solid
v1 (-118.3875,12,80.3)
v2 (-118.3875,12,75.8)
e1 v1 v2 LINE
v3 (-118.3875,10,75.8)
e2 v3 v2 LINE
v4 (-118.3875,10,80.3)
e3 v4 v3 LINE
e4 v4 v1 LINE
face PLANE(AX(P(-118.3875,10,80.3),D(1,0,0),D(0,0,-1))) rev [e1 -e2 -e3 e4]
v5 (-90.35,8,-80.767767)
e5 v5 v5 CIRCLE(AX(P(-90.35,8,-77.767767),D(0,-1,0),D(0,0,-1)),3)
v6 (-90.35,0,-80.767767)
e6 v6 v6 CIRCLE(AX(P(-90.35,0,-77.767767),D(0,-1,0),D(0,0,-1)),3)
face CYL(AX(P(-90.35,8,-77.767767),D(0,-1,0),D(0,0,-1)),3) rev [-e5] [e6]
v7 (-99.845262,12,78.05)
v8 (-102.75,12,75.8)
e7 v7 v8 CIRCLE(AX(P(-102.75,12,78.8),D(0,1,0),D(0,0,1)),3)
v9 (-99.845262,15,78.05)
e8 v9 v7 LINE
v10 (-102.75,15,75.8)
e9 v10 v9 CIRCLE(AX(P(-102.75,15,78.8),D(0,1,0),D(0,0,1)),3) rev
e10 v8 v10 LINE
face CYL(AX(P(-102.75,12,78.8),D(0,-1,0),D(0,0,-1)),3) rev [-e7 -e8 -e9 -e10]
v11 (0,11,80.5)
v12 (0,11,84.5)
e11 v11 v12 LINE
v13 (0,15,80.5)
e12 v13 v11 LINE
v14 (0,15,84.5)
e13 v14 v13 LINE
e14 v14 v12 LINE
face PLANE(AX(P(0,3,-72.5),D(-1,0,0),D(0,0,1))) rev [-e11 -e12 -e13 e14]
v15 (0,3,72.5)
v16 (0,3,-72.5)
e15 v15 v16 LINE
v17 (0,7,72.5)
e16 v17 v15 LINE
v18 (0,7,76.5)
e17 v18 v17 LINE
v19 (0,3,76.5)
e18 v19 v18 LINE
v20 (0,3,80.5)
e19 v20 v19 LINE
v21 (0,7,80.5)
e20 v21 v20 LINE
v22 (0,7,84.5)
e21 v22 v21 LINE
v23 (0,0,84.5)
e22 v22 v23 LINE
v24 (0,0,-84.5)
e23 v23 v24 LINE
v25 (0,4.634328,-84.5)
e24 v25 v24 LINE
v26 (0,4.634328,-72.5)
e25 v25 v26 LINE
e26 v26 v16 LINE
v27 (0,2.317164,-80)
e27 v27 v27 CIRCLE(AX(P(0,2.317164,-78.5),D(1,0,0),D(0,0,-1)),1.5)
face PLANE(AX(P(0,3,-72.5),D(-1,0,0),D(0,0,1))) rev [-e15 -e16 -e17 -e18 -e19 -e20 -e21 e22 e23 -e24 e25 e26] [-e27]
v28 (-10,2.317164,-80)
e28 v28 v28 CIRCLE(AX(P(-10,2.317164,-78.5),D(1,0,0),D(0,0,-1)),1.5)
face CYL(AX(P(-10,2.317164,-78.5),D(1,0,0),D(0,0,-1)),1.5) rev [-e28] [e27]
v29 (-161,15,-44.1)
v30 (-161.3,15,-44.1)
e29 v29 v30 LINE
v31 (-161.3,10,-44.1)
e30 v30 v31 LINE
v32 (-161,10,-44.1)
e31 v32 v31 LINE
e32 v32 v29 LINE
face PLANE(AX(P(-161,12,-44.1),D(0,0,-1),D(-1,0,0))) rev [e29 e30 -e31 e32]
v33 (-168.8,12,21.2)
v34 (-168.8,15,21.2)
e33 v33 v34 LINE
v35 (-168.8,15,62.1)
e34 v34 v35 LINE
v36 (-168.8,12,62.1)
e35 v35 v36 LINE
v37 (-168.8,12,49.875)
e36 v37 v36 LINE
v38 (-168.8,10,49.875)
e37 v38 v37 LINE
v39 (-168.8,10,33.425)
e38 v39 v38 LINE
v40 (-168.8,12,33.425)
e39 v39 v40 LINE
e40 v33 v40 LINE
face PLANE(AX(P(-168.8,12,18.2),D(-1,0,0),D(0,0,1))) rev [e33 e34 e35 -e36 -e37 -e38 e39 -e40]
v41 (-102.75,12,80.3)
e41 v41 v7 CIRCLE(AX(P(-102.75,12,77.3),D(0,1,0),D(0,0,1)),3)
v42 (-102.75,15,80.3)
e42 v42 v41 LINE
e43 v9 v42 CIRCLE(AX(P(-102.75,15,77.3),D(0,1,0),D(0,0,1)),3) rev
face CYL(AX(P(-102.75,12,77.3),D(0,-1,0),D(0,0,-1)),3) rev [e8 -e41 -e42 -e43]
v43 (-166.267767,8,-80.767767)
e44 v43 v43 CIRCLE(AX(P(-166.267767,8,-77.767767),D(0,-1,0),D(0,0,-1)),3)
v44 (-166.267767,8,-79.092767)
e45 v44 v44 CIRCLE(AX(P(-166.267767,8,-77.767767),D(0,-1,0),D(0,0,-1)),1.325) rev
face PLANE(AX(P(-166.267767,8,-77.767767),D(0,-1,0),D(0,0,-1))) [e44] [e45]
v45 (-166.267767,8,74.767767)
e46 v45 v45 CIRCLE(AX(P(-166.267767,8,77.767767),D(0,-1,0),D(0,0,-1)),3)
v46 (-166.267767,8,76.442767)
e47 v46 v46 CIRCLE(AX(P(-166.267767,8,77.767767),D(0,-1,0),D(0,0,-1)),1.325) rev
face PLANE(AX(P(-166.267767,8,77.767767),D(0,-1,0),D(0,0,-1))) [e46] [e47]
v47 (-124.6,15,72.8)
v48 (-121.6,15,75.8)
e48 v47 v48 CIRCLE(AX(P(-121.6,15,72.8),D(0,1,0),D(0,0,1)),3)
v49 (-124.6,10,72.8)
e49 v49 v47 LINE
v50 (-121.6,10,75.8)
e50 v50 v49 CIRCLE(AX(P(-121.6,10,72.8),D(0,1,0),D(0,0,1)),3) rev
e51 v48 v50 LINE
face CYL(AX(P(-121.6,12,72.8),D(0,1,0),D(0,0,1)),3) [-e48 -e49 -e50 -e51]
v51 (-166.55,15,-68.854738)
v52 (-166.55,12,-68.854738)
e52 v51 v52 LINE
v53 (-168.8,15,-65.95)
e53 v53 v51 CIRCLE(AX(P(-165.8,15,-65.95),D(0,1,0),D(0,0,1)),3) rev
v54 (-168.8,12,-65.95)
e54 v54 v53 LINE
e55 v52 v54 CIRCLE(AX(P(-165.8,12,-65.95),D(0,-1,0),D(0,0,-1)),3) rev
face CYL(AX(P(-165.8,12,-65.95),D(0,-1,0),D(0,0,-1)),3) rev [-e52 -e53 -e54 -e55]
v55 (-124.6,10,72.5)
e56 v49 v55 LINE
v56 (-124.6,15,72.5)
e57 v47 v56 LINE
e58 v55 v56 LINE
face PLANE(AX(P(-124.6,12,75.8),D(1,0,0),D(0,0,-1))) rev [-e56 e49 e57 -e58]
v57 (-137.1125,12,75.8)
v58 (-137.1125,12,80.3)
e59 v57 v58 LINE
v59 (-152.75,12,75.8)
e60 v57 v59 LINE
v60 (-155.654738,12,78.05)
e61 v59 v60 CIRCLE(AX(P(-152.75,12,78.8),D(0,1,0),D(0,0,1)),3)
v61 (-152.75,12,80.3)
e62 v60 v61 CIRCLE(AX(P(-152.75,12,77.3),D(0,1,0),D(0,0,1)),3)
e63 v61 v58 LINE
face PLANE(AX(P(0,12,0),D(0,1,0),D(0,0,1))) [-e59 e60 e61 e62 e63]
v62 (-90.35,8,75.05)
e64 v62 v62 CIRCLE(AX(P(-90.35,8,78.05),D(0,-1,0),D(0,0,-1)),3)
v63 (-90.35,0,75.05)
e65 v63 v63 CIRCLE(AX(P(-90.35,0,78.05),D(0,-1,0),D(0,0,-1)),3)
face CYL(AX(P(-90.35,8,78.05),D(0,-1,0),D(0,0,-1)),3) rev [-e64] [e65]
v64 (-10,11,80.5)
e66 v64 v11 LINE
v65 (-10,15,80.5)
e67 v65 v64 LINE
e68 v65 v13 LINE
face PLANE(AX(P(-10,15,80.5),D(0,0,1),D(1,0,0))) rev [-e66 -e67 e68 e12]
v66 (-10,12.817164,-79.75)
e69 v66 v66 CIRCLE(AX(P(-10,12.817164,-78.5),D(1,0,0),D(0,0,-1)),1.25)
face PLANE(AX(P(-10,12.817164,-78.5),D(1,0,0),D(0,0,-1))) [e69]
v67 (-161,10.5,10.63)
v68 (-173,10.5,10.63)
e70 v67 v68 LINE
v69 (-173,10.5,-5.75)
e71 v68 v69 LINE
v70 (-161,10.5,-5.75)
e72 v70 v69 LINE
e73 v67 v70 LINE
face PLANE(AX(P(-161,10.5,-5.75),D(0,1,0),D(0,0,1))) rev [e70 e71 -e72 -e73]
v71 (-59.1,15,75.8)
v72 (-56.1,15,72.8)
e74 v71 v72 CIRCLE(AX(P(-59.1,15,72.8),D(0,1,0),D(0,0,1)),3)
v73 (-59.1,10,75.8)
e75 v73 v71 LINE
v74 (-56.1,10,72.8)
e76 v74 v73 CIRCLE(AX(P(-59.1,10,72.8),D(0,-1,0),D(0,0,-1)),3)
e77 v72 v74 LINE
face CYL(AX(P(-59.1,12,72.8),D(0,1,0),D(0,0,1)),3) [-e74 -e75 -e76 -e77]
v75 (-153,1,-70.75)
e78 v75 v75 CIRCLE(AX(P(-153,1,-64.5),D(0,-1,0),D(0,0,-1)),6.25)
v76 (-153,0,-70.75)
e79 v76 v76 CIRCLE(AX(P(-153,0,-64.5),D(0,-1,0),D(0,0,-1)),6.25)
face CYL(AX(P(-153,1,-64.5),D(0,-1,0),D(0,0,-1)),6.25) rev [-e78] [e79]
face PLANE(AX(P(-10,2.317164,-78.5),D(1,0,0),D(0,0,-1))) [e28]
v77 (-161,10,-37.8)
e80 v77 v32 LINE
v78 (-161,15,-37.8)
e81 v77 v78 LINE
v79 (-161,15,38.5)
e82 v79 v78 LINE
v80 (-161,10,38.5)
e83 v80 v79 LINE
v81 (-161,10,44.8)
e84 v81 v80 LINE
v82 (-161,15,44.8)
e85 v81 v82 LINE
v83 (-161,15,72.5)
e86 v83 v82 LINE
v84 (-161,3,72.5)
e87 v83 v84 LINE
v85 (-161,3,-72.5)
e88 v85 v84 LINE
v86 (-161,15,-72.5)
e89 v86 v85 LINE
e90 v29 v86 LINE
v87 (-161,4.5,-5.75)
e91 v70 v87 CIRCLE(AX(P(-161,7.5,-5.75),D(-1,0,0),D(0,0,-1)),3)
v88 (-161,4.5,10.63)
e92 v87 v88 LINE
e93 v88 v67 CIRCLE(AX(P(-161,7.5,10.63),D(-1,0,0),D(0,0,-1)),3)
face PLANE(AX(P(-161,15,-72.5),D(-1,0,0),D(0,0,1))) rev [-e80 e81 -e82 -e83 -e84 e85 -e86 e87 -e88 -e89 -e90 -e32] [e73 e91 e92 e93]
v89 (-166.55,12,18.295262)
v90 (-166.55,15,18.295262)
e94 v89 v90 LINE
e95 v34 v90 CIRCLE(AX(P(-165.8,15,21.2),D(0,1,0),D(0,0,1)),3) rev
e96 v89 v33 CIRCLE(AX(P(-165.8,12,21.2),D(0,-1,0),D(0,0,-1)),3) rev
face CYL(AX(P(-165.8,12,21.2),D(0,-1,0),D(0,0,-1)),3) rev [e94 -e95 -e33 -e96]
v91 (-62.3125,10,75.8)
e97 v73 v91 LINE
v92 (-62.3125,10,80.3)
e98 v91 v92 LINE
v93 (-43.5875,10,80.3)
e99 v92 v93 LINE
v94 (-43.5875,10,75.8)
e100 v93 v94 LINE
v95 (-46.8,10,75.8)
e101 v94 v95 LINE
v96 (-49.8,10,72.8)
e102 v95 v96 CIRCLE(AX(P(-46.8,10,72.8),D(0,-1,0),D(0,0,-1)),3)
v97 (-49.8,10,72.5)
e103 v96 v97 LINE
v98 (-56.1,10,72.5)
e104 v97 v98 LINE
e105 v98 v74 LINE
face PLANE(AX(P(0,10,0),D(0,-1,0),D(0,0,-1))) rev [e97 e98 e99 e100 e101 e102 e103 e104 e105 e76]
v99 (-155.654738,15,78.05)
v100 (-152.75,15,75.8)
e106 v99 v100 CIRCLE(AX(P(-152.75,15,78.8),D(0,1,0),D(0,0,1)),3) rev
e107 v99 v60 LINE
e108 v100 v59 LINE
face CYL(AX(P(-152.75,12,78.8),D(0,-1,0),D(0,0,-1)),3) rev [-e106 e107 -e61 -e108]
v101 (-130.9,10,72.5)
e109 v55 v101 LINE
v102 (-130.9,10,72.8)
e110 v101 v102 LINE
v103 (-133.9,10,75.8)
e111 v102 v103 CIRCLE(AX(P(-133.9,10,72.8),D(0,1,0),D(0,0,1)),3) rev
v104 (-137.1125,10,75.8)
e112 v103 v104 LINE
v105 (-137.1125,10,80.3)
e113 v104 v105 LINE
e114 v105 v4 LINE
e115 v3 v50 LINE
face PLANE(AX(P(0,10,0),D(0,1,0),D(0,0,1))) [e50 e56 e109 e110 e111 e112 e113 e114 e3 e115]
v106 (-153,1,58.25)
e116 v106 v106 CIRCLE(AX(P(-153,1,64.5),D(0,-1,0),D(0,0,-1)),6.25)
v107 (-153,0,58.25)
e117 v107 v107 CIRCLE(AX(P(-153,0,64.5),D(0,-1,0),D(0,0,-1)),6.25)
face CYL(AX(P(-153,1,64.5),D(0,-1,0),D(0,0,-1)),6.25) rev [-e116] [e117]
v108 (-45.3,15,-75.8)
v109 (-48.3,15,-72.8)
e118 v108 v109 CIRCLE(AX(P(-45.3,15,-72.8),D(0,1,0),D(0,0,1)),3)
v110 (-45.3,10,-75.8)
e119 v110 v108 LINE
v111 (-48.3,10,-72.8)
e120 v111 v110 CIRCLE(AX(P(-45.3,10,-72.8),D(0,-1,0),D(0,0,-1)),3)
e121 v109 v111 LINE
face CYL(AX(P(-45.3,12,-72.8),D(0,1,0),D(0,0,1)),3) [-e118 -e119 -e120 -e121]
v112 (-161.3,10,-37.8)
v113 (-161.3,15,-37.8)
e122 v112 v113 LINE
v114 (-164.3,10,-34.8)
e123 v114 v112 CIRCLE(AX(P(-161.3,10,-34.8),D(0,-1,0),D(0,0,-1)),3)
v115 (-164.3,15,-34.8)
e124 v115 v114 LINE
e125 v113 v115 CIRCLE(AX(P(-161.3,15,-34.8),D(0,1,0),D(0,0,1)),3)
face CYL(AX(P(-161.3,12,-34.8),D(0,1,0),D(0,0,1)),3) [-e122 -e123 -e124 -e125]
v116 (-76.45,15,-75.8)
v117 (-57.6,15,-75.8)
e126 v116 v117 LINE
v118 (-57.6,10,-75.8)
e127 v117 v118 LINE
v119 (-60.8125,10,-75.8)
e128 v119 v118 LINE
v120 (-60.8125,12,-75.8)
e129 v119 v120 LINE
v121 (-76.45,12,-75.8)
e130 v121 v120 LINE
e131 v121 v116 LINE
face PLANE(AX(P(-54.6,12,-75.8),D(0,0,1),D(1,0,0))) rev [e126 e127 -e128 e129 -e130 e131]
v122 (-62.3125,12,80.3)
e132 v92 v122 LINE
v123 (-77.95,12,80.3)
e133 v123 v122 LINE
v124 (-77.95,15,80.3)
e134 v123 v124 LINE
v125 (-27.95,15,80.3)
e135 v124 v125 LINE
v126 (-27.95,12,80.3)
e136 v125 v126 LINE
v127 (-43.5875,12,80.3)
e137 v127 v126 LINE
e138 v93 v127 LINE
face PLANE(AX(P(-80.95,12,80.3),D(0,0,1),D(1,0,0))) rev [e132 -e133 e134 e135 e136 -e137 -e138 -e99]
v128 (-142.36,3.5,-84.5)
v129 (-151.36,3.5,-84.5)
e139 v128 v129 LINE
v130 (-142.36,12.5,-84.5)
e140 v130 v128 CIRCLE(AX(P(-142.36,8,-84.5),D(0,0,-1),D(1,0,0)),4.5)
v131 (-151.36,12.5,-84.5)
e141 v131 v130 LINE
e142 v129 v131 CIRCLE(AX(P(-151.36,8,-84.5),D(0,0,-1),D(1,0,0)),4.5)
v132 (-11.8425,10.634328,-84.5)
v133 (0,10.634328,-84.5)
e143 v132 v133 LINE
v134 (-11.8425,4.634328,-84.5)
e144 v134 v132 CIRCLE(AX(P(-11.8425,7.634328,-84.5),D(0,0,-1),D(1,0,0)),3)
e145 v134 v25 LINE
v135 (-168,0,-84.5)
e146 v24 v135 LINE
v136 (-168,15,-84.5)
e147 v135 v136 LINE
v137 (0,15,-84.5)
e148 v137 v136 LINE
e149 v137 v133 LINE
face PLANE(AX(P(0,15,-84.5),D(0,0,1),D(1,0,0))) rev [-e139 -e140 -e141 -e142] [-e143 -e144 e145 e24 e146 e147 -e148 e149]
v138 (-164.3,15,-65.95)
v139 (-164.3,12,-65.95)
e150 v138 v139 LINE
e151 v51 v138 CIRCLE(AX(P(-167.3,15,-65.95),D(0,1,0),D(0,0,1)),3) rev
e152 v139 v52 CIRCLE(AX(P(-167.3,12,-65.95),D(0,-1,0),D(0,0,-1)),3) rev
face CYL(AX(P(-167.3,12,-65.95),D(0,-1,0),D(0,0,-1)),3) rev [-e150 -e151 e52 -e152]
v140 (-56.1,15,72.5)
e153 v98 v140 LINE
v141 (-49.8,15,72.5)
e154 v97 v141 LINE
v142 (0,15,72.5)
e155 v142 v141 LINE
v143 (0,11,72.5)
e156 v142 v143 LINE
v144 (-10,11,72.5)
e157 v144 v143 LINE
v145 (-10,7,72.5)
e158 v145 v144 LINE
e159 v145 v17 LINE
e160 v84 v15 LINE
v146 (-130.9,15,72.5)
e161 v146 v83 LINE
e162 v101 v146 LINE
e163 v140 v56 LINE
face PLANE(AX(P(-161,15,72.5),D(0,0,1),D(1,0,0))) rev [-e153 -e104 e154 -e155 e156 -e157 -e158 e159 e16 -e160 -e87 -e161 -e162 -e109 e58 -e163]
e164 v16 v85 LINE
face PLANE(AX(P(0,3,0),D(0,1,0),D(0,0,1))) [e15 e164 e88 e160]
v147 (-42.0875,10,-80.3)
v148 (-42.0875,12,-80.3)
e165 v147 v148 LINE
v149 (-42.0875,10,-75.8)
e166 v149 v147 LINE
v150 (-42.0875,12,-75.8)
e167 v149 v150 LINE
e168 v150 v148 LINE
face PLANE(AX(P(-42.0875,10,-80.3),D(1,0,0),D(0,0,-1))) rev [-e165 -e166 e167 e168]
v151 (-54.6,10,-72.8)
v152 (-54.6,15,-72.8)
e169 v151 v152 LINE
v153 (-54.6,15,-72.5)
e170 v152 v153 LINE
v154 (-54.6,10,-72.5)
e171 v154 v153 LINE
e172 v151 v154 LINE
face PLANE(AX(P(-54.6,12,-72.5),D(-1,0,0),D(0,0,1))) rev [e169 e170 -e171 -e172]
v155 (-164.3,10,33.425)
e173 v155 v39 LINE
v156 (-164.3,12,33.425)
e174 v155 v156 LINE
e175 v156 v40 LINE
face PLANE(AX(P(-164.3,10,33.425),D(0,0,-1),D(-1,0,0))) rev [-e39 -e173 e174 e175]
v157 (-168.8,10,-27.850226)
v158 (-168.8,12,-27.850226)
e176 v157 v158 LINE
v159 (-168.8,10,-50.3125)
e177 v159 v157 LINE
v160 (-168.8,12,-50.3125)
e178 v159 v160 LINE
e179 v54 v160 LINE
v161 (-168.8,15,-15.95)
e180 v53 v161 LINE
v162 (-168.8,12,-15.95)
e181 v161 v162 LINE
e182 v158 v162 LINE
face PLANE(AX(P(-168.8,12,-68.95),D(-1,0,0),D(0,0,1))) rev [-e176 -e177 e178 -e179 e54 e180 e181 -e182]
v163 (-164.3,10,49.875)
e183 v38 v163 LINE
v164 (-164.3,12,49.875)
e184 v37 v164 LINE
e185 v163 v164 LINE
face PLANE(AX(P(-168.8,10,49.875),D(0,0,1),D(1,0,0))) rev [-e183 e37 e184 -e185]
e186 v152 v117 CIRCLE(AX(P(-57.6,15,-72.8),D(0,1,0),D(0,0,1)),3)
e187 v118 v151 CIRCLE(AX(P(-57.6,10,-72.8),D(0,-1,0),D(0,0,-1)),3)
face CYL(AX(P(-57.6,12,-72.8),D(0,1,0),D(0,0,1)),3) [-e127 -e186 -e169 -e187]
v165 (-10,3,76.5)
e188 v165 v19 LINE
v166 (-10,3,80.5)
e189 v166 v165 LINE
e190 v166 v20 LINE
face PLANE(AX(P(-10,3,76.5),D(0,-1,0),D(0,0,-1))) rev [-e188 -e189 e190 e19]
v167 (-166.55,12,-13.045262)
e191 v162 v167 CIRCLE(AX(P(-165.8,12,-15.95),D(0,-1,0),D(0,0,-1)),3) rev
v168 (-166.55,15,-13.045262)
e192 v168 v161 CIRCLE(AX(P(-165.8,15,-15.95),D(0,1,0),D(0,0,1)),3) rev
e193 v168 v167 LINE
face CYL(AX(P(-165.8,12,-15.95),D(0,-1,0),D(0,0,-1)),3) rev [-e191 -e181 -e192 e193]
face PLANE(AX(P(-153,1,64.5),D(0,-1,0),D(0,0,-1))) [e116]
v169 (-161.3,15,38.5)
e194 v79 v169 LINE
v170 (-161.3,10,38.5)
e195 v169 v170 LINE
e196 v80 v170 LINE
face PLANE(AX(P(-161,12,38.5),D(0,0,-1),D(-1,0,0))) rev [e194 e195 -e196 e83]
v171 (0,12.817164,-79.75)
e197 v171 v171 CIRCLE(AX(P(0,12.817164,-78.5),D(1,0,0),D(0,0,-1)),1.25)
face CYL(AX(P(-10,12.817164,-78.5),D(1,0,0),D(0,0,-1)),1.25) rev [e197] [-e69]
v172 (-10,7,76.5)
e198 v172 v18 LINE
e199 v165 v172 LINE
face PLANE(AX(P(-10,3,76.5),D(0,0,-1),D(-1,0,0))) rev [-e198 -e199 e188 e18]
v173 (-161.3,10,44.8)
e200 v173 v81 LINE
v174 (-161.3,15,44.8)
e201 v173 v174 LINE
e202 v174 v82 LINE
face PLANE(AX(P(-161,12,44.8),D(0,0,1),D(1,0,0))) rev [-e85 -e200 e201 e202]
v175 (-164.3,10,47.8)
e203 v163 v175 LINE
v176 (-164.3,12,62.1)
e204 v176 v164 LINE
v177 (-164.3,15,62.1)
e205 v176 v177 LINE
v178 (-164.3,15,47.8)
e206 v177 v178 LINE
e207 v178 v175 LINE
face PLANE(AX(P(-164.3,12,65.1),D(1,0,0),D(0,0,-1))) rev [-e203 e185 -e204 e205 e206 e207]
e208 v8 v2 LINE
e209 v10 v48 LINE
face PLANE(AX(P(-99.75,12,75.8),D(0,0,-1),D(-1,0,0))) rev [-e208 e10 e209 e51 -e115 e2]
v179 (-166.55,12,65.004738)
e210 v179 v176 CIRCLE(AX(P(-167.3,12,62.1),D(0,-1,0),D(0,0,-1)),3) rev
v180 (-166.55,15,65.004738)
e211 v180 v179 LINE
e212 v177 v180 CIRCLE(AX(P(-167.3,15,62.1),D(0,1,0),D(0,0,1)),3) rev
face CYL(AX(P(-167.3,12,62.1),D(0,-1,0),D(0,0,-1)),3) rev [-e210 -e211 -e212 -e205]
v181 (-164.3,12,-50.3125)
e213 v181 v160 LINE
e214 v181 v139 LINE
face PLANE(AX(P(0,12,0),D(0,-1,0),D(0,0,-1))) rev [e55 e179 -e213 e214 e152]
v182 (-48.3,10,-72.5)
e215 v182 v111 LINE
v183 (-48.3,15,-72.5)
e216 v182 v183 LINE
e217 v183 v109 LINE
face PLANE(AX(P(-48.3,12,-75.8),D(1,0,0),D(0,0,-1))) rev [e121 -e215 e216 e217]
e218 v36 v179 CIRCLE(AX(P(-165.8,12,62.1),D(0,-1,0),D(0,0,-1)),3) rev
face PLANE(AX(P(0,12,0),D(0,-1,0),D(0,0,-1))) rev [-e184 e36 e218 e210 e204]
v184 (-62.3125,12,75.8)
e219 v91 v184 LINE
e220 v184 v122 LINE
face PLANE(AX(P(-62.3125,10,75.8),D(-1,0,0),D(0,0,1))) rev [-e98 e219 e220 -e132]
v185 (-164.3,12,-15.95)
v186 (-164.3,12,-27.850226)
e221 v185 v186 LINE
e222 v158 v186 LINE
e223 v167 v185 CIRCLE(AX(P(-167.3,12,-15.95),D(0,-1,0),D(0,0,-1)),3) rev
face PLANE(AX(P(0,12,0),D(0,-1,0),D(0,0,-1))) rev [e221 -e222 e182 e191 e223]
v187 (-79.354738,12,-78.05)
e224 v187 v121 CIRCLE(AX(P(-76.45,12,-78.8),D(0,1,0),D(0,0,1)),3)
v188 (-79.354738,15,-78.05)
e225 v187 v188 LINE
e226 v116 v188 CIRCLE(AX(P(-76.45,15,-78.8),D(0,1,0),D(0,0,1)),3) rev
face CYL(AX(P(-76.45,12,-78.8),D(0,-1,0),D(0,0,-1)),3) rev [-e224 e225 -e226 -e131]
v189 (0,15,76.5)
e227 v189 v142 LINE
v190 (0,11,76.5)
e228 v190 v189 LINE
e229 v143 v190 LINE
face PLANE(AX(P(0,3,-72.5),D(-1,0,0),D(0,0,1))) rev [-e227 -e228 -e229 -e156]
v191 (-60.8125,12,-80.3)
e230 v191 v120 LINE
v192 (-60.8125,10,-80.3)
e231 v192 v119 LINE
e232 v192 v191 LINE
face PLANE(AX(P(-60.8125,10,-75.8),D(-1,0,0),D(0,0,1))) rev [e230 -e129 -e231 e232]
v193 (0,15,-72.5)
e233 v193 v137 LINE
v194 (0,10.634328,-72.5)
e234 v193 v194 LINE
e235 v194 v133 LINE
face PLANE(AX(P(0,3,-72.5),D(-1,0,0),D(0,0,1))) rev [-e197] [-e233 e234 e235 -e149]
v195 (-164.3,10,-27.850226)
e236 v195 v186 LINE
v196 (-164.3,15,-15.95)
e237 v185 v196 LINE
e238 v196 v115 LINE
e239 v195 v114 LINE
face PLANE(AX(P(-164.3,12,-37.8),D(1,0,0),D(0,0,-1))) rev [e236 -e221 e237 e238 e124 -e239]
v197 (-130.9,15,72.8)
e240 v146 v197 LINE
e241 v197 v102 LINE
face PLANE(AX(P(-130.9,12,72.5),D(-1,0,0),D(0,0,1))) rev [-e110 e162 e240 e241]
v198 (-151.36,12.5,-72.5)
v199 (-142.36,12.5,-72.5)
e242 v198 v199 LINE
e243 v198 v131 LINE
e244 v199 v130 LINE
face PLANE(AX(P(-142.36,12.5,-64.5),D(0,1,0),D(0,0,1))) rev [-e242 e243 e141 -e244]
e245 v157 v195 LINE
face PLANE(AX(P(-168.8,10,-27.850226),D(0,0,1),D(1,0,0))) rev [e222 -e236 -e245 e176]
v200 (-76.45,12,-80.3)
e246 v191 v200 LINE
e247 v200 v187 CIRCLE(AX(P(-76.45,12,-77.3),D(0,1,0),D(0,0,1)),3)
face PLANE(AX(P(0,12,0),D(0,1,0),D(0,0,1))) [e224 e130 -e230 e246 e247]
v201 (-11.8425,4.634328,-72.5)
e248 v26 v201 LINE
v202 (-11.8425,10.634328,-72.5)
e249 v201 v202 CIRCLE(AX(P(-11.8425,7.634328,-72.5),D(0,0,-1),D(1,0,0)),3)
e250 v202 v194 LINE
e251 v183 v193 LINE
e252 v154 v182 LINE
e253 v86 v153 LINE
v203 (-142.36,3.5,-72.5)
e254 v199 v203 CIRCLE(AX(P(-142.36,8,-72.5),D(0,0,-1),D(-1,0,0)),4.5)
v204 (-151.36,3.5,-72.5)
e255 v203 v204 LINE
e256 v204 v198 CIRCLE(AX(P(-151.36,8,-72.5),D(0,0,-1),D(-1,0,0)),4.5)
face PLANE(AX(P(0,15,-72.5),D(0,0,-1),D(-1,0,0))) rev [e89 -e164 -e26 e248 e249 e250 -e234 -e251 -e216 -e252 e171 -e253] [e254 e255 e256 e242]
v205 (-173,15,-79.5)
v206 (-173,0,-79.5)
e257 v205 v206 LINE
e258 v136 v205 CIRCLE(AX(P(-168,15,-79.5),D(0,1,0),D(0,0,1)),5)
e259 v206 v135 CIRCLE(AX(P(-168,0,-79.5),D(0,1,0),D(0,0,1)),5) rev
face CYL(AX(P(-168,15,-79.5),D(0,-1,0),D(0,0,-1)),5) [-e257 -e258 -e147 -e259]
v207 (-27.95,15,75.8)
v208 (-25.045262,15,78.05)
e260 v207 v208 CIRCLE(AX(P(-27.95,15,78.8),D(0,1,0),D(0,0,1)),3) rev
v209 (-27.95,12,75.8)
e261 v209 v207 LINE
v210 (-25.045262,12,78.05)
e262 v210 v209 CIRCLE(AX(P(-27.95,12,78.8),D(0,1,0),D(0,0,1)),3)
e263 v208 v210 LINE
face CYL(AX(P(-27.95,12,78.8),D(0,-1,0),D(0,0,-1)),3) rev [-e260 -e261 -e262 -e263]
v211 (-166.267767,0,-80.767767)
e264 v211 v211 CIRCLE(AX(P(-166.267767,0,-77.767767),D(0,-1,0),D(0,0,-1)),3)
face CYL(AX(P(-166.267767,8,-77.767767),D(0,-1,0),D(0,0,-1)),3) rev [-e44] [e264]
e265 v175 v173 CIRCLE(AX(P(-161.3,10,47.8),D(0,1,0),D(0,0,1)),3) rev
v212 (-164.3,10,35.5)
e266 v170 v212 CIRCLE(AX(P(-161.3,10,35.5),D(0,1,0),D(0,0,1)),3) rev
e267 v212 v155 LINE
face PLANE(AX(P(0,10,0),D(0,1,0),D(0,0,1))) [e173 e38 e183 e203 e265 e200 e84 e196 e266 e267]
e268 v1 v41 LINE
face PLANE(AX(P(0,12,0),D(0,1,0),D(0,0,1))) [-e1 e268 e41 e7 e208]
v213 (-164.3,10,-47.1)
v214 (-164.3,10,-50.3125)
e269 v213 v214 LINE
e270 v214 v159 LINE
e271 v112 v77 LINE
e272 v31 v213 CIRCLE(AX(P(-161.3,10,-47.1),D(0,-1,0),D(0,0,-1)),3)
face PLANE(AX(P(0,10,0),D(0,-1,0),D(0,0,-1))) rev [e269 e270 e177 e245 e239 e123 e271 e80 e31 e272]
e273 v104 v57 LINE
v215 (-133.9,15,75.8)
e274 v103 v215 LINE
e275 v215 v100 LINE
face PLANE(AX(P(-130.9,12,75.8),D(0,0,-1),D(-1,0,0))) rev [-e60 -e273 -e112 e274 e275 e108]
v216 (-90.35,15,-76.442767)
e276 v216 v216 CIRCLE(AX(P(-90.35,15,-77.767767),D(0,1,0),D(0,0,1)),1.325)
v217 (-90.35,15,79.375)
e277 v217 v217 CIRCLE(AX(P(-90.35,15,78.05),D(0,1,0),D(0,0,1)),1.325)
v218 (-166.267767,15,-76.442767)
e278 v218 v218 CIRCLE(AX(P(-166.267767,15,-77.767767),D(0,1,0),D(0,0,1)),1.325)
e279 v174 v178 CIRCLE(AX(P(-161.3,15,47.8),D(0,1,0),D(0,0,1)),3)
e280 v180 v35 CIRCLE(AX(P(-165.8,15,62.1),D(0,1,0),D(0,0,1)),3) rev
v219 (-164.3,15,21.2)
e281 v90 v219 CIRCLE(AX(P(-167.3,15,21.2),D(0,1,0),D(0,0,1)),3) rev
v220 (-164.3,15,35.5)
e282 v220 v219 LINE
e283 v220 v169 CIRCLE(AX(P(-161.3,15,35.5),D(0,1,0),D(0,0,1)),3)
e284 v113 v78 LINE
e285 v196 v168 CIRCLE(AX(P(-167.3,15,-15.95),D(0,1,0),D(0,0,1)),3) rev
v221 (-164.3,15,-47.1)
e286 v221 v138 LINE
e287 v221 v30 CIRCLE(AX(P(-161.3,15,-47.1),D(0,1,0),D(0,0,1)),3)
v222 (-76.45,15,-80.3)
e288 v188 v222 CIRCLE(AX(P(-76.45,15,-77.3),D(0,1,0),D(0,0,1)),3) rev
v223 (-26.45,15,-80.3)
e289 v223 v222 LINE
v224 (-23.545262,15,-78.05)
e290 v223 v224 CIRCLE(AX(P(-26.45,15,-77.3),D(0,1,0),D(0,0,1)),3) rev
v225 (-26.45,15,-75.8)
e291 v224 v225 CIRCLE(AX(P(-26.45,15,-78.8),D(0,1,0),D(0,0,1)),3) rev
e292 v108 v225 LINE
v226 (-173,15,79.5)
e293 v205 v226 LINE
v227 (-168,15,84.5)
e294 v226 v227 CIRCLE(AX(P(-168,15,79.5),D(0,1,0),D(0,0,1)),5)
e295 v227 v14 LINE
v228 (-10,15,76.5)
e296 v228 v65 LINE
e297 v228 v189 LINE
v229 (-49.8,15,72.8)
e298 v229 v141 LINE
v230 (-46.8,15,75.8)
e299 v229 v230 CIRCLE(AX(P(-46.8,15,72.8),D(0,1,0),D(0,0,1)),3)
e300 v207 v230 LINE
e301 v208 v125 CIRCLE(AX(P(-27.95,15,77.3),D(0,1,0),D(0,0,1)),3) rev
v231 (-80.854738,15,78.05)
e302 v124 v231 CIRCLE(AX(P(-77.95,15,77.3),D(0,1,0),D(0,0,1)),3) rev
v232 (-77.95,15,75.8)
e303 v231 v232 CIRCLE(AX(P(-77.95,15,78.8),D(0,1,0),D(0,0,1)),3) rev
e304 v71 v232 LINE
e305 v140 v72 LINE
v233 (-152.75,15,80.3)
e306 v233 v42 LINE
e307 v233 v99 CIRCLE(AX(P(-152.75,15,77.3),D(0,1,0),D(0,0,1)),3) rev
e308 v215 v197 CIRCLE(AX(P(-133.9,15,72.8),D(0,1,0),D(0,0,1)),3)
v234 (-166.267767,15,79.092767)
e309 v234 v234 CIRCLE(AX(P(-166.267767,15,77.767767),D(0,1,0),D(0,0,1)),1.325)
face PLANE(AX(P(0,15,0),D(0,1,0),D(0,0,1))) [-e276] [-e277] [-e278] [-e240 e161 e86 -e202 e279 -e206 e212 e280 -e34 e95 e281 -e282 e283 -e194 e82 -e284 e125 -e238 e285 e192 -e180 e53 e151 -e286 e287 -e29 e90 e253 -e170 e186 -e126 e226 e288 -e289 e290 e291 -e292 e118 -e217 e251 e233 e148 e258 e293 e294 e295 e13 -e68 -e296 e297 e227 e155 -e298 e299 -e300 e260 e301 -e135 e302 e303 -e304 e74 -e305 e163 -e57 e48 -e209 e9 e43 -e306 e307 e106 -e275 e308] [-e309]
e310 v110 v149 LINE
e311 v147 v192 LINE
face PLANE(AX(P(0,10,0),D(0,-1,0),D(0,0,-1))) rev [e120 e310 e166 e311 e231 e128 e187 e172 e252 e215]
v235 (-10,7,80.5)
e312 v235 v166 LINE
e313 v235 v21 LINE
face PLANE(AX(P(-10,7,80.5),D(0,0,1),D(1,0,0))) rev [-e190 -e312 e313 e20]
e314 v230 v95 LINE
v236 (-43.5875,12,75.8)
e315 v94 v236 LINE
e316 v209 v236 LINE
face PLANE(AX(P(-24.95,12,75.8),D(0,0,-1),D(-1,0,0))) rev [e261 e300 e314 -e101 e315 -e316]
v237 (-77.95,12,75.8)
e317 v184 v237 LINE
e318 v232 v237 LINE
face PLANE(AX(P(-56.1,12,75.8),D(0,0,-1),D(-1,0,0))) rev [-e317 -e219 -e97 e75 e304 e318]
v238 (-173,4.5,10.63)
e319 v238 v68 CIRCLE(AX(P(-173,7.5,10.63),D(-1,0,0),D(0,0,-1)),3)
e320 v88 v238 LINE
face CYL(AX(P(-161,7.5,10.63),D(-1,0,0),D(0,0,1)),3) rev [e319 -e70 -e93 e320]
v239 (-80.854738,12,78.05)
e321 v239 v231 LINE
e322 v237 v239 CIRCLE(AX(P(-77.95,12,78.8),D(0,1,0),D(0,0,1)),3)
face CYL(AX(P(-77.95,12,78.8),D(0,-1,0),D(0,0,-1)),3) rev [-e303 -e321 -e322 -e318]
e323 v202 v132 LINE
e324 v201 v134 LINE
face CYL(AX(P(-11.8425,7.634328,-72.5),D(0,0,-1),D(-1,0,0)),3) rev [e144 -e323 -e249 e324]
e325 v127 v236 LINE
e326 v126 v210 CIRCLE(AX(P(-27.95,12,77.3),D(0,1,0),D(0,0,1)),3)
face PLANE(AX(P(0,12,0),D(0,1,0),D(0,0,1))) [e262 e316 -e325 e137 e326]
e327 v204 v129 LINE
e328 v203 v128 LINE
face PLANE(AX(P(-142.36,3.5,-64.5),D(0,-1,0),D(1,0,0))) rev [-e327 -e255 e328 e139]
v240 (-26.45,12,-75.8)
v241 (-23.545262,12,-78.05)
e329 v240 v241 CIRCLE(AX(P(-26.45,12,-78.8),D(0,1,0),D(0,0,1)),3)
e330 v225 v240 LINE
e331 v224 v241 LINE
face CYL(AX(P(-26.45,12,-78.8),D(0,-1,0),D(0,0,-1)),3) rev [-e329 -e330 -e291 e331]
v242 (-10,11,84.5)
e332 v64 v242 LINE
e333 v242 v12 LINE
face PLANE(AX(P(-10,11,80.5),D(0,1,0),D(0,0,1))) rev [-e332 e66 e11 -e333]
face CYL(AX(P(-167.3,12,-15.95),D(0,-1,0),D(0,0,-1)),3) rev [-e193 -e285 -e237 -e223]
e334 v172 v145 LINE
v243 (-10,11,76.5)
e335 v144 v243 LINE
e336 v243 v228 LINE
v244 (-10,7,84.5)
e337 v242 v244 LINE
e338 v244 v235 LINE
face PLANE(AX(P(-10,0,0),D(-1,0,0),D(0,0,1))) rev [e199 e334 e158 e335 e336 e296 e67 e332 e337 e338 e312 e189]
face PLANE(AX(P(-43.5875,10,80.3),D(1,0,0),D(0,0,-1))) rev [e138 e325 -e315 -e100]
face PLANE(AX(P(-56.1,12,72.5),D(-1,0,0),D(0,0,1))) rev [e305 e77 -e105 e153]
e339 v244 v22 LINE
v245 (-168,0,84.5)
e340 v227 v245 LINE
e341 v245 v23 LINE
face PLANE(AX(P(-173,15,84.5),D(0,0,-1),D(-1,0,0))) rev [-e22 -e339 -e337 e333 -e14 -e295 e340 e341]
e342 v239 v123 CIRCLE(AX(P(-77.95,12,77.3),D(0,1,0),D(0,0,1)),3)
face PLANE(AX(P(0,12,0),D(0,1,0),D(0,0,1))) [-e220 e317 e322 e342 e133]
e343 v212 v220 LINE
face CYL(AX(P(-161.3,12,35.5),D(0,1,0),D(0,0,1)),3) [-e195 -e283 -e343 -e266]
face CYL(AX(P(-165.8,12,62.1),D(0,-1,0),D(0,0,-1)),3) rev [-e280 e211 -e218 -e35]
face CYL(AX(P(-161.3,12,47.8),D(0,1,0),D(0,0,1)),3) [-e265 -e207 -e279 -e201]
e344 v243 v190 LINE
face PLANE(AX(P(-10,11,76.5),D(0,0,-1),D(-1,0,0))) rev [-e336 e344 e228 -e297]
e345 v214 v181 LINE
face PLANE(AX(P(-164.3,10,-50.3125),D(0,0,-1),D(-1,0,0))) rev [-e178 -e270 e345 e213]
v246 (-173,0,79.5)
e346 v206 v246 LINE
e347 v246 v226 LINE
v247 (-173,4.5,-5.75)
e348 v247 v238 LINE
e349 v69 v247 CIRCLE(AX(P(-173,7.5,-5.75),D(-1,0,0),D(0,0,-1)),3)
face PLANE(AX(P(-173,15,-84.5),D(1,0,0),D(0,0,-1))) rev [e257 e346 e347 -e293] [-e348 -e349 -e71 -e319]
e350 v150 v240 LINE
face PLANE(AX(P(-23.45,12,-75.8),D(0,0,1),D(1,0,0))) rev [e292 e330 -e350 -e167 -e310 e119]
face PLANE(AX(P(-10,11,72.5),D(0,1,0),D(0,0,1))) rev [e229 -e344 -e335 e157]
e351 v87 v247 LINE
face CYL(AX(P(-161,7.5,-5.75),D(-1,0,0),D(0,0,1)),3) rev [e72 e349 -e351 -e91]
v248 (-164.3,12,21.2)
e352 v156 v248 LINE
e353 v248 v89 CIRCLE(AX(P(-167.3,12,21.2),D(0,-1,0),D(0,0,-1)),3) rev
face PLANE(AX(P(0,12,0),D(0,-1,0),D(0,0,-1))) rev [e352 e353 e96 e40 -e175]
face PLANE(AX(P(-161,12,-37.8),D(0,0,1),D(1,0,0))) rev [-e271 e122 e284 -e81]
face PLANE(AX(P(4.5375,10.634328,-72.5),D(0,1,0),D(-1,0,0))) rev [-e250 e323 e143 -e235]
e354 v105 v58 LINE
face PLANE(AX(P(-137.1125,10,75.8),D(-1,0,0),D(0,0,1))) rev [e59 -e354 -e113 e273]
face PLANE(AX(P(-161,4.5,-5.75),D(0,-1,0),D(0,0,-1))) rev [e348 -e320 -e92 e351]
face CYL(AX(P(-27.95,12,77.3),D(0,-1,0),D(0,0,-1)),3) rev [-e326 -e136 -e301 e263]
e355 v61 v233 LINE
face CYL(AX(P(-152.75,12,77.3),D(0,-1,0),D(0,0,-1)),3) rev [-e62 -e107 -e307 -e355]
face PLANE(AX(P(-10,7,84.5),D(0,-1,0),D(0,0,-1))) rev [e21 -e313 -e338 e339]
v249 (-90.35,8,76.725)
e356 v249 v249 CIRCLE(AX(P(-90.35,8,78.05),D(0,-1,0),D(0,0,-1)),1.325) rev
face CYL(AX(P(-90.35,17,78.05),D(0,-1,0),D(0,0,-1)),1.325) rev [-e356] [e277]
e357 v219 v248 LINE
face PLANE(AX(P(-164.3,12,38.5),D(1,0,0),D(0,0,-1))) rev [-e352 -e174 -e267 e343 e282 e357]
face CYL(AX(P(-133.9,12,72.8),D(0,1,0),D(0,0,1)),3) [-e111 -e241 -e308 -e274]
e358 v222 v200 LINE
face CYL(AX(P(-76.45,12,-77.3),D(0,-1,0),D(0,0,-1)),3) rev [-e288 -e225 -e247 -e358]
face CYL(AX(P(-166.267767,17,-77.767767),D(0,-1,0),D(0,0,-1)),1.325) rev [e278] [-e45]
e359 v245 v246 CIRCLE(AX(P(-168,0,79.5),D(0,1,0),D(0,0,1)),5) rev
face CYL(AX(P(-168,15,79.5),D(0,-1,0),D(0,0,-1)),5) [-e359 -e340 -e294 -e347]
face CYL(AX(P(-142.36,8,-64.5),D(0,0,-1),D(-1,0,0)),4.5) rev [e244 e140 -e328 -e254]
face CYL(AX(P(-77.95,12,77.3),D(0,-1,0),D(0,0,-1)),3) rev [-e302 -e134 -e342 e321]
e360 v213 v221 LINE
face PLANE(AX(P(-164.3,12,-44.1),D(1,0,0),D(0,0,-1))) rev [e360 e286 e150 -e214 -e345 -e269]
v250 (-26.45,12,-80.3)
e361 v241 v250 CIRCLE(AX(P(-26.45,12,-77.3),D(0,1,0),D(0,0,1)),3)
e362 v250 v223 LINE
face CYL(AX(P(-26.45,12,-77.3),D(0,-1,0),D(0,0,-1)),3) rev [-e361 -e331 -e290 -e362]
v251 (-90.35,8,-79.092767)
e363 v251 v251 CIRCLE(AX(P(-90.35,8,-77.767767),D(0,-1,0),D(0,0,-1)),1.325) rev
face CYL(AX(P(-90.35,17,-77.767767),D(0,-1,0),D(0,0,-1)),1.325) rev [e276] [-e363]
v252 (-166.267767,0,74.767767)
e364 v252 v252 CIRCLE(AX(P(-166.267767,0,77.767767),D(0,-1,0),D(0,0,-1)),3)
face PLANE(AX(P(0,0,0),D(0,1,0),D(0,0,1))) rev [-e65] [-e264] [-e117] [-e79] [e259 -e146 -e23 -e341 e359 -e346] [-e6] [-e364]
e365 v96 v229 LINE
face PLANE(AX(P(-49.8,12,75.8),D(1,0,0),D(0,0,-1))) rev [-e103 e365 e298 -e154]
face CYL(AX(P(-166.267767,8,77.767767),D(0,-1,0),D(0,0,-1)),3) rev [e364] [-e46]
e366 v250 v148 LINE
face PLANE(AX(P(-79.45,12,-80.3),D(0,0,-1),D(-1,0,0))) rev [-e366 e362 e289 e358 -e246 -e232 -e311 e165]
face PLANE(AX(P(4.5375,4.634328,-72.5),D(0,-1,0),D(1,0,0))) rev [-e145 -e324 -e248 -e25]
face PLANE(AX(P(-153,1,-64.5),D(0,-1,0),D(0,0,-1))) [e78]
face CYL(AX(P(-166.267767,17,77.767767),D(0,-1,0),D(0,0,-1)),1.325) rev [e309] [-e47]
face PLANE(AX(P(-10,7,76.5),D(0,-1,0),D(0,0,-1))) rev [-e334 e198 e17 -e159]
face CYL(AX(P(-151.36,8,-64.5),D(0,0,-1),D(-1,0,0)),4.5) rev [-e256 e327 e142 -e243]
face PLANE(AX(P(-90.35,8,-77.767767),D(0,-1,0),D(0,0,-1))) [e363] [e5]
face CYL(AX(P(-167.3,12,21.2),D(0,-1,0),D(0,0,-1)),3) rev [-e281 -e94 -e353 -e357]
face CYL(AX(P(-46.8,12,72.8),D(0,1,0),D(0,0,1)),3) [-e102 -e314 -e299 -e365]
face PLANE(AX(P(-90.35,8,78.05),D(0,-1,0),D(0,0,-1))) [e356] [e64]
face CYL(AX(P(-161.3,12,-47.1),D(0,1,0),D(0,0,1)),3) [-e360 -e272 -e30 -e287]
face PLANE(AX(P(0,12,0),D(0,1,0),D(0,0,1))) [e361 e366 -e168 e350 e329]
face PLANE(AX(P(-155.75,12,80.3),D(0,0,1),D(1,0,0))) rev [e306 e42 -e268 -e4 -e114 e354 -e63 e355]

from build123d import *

# Parameters (mm, degrees)
SKETCH1_W           = 161
SKETCH1_H           = 145
BOSS_EXTRUDE1_DEPTH = 3
BOSS_EXTRUDE2_DEPTH = 15
CUT_EXTRUDE1_DEPTH  = 3
CUT_EXTRUDE2_DEPTH  = 2
CUT_EXTRUDE3_DEPTH  = 12
CUT_EXTRUDE5_DEPTH  = 12
CUT_EXTRUDE6_DEPTH  = 20
CUT_EXTRUDE8_DEPTH  = 10
FILLET2_R           = 5
FILLET3_R           = 5
SKETCH11_R          = 1.5
SKETCH11_R_2        = 1.25
CUT_EXTRUDE9_DEPTH  = 10
SKETCH12_R          = 1.325
CUT_EXTRUDE10_DEPTH = 17
SKETCH13_R          = 3
CUT_EXTRUDE11_DEPTH = 8
SKETCH14_R          = 6.25
CUT_EXTRUDE12_DEPTH = 1
FILLET5_R           = 3
FILLET6_R           = 3


with BuildPart() as part:
    # Sketch1 → Boss-Extrude1 (new body)
    with BuildSketch(Plane(origin=(0, 0, 0), x_dir=(1, 0, 0), z_dir=(0, 1, 0))):
        with Locations((-80.5, 0)):
            Rectangle(SKETCH1_W, SKETCH1_H)
    extrude(amount=BOSS_EXTRUDE1_DEPTH)

    # Sketch2 → Boss-Extrude2 (add)
    with BuildSketch(Plane(origin=(0, 0, 0), x_dir=(1, 0, 0), z_dir=(0, 1, 0))):
        Polygon((0, 72.5), (0, 84.5), (-173, 84.5), (-173, -84.5), (0, -84.5), (0, -72.5), (-161, -72.5), (-161, 72.5), align=None)
    extrude(amount=BOSS_EXTRUDE2_DEPTH)

    # Sketch3 → Cut-Extrude1 (cut)
    with BuildSketch(Plane(origin=(0, 15, 0), x_dir=(1, 0, 0), z_dir=(0, 1, 0))):
        Polygon((-161, 44.1), (-161, 37.8), (-164.3, 37.8), (-164.3, 12.95), (-168.8, 12.95), (-168.8, 68.95), (-164.3, 68.95), (-164.3, 44.1), align=None)
        Polygon((-24.95, -75.8), (-49.8, -75.8), (-49.8, -72.5), (-56.1, -72.5), (-56.1, -75.8), (-80.95, -75.8), (-80.95, -80.3), (-24.95, -80.3), align=None)
        Polygon((-161, -38.5), (-161, -44.8), (-164.3, -44.8), (-164.3, -65.1), (-168.8, -65.1), (-168.8, -18.2), (-164.3, -18.2), (-164.3, -38.5), align=None)
        Polygon((-99.75, -80.3), (-99.75, -75.8), (-124.6, -75.8), (-124.6, -72.5), (-130.9, -72.5), (-130.9, -75.8), (-155.75, -75.8), (-155.75, -80.3), align=None)
        Polygon((-48.3, 75.8), (-48.3, 72.5), (-54.6, 72.5), (-54.6, 75.8), (-79.45, 75.8), (-79.45, 80.3), (-23.45, 80.3), (-23.45, 75.8), align=None)
    extrude(amount=-CUT_EXTRUDE1_DEPTH, mode=Mode.SUBTRACT)

    # Sketch4 → Cut-Extrude2 (cut)
    with BuildSketch(Plane(origin=(0, 12, 0), x_dir=(1, 0, 0), z_dir=(0, 1, 0))):
        Polygon((-54.6, 72.5), (-48.3, 72.5), (-48.3, 75.8), (-42.0875, 75.8), (-42.0875, 80.3), (-60.8125, 80.3), (-60.8125, 75.8), (-54.6, 75.8), align=None)
        Polygon((-161, 44.1), (-161, 37.8), (-164.3, 37.8), (-164.3, 27.850226284), (-168.8, 27.850226284), (-168.8, 50.3125), (-164.3, 50.3125), (-164.3, 44.1), align=None)
        Polygon((-168.8, -33.425), (-168.8, -49.875), (-164.3, -49.875), (-164.3, -44.8), (-161, -44.8), (-161, -38.5), (-164.3, -38.5), (-164.3, -33.425), align=None)
        Polygon((-130.9, -72.5), (-130.9, -75.8), (-137.1125, -75.8), (-137.1125, -80.3), (-118.3875, -80.3), (-118.3875, -75.8), (-124.6, -75.8), (-124.6, -72.5), align=None)
        Polygon((-56.1, -75.8), (-62.3125, -75.8), (-62.3125, -80.3), (-43.5875, -80.3), (-43.5875, -75.8), (-49.8, -75.8), (-49.8, -72.5), (-56.1, -72.5), align=None)
    extrude(amount=-CUT_EXTRUDE2_DEPTH, mode=Mode.SUBTRACT)

    # Sketch5 → Cut-Extrude3 (cut)
    with BuildSketch(Plane.ZY.offset(173)):
        with BuildLine():
            Line((-5.75, 10.5), (10.63, 10.5))
            ThreePointArc((10.63, 10.5), (13.63, 7.5), (10.63, 4.5))
            Line((10.63, 4.5), (-5.75, 4.5))
            ThreePointArc((-5.75, 4.5), (-8.75, 7.5), (-5.75, 10.5))
        make_face()
    extrude(amount=-CUT_EXTRUDE3_DEPTH, mode=Mode.SUBTRACT)

    # Sketch7 → Cut-Extrude5 (cut)
    with BuildSketch(Plane(origin=(0, 0, -84.5), x_dir=(-1, 0, 0), z_dir=(0, 0, -1))):
        with BuildLine():
            Line((-4.5375, 10.634328206), (11.8425, 10.634328206))
            ThreePointArc((11.8425, 10.634328206), (14.8425, 7.634328206), (11.8425, 4.634328206))
            Line((11.8425, 4.634328206), (-4.5375, 4.634328206))
            ThreePointArc((-4.5375, 4.634328206), (-7.5375, 7.634328206), (-4.5375, 10.634328206))
        make_face()
    extrude(amount=-CUT_EXTRUDE5_DEPTH, mode=Mode.SUBTRACT)

    # Sketch8 → Cut-Extrude6 (cut)
    with BuildSketch(Plane(origin=(0, 0, -84.5), x_dir=(-1, 0, 0), z_dir=(0, 0, -1))):
        with BuildLine():
            Line((142.36, 12.5), (151.36, 12.5))
            ThreePointArc((151.36, 12.5), (155.86, 8), (151.36, 3.5))
            Line((151.36, 3.5), (142.36, 3.5))
            ThreePointArc((142.36, 3.5), (137.86, 8), (142.36, 12.5))
        make_face()
    extrude(amount=-CUT_EXTRUDE6_DEPTH, mode=Mode.SUBTRACT)

    # Sketch10 → Cut-Extrude8 (cut)
    with BuildSketch(Plane(origin=(0, 0, 0), x_dir=(0, 0, -1), z_dir=(1, 0, 0))):
        Polygon((-80.5, 15), (-76.5, 15), (-76.5, 11), (-72.5, 11), (-72.5, 7), (-76.5, 7), (-76.5, 3), (-80.5, 3), (-80.5, 7), (-84.5, 7), (-84.5, 11), (-80.5, 11), align=None)
    extrude(amount=-CUT_EXTRUDE8_DEPTH, mode=Mode.SUBTRACT)

    # Fillet2
    fillet2_edges = [part.edges().sort_by_distance(p)[0] for p in [
        (-173, 7.5, 84.5),
    ]]
    fillet(fillet2_edges, radius=FILLET2_R)

    # Fillet3
    fillet3_edges = [part.edges().sort_by_distance(p)[0] for p in [
        (-173, 7.5, -84.5),
    ]]
    fillet(fillet3_edges, radius=FILLET3_R)

    # Sketch11 → Cut-Extrude9 (cut)
    with BuildSketch(Plane(origin=(0, 0, 0), x_dir=(0, 0, -1), z_dir=(1, 0, 0))):
        with Locations((78.5, 2.317164103)):
            Circle(SKETCH11_R)
        with Locations((78.5, 12.817164103)):
            Circle(SKETCH11_R_2)
    extrude(amount=-CUT_EXTRUDE9_DEPTH, mode=Mode.SUBTRACT)

    # Sketch12 → Cut-Extrude10 (cut)
    with BuildSketch(Plane(origin=(0, 0, 0), x_dir=(-1, 0, 0), z_dir=(0, -1, 0))):
        with Locations(Location((166.267766953, -77.767766953, 0), (0, 0, 90))):
            Circle(SKETCH12_R)
        with Locations(Location((90.35, -78.05, 0), (0, 0, 90))):
            Circle(SKETCH12_R)
        with Locations((-80.0525, -78.05)):
            Circle(SKETCH12_R)
        with Locations((-164.807766953, -77.767766953)):
            Circle(SKETCH12_R)
        with Locations((-164.807766953, 77.767766953)):
            Circle(SKETCH12_R)
        with Locations((-80.0525, 78.05)):
            Circle(SKETCH12_R)
        with Locations(Location((90.35, 77.767766953, 0), (0, 0, 90))):
            Circle(SKETCH12_R)
        with Locations(Location((166.267766953, 77.767766953, 0), (0, 0, 90))):
            Circle(SKETCH12_R)
    extrude(amount=-CUT_EXTRUDE10_DEPTH, mode=Mode.SUBTRACT)

    # Sketch13 → Cut-Extrude11 (cut)
    with BuildSketch(Plane.XZ):
        with Locations(Location((-166.267766953, -77.767766953, 0), (0, 0, 270))):
            Circle(SKETCH13_R)
        with Locations(Location((-90.35, -77.767766953, 0), (0, 0, 270))):
            Circle(SKETCH13_R)
        with Locations(Location((-166.267766953, 77.767766953, 0), (0, 0, 270))):
            Circle(SKETCH13_R)
        with Locations(Location((-90.35, 78.05, 0), (0, 0, 270))):
            Circle(SKETCH13_R)
    extrude(amount=-CUT_EXTRUDE11_DEPTH, mode=Mode.SUBTRACT)

    # Sketch14 → Cut-Extrude12 (cut)
    with BuildSketch(Plane(origin=(0, 0, 0), x_dir=(-1, 0, 0), z_dir=(0, -1, 0))):
        with Locations(Location((153, -64.5, 0), (0, 0, 90))):
            Circle(SKETCH14_R)
        with Locations(Location((153, 64.5, 0), (0, 0, 90))):
            Circle(SKETCH14_R)
    extrude(amount=-CUT_EXTRUDE12_DEPTH, mode=Mode.SUBTRACT)

    # Fillet5
    fillet5_edges = [part.edges().sort_by_distance(p)[0] for p in [
        (-164.3, 12.5, -44.1),
        (-164.3, 12.5, -37.8),
        (-56.1, 12.5, 75.8),
        (-49.8, 12.5, 75.8),
        (-164.3, 12.5, 38.5),
        (-164.3, 12.5, 44.8),
        (-130.9, 12.5, 75.8),
        (-124.6, 12.5, 75.8),
        (-48.3, 12.5, -75.8),
        (-54.6, 12.5, -75.8),
    ]]
    fillet(fillet5_edges, radius=FILLET5_R)

    # Fillet6
    # the kernel refuses this fillet: 3 mm, written as the material it adds along each edge
    with BuildSketch(Plane(origin=(-168.8, 15, -12.95), x_dir=(0, 0, -1), z_dir=(0, -1, 0)), Plane(origin=(-164.3, 15, -12.95), x_dir=(-1, 0, 0), z_dir=(0, -1, 0)), Plane(origin=(-164.3, 15, -68.95), x_dir=(0, 0, 1), z_dir=(0, -1, 0)), Plane(origin=(-168.8, 15, -68.95), x_dir=(1, 0, 0), z_dir=(0, -1, 0)), Plane(origin=(-168.8, 15, 18.2), x_dir=(1, 0, 0), z_dir=(0, -1, 0)), Plane(origin=(-164.3, 15, 18.2), x_dir=(0, 0, 1), z_dir=(0, -1, 0)), Plane(origin=(-168.8, 15, 65.1), x_dir=(0, 0, -1), z_dir=(0, -1, 0)), Plane(origin=(-164.3, 15, 65.1), x_dir=(-1, 0, 0), z_dir=(0, -1, 0)), Plane(origin=(-23.45, 15, -75.8), x_dir=(-1, 0, 0), z_dir=(0, -1, 0)), Plane(origin=(-23.45, 15, -80.3), x_dir=(0, 0, 1), z_dir=(0, -1, 0)), Plane(origin=(-79.45, 15, -75.8), x_dir=(0, 0, -1), z_dir=(0, -1, 0)), Plane(origin=(-79.45, 15, -80.3), x_dir=(1, 0, 0), z_dir=(0, -1, 0))) as fillet6_piece_1:
        with BuildLine():
            CenterArc((FILLET6_R, FILLET6_R), FILLET6_R, 180, 90)
            Line((0, FILLET6_R), (0, 0))
            Line((0, 0), (FILLET6_R, 0))
        make_face()
    extrude(amount=10.5)
    with BuildSketch(Plane(origin=(-155.75, 15, 75.8), x_dir=(0, 0, 1), z_dir=(0, -1, 0)), Plane(origin=(-155.75, 15, 80.3), x_dir=(1, 0, 0), z_dir=(0, -1, 0)), Plane(origin=(-99.75, 15, 80.3), x_dir=(0, 0, -1), z_dir=(0, -1, 0)), Plane(origin=(-99.75, 15, 75.8), x_dir=(-1, 0, 0), z_dir=(0, -1, 0)), Plane(origin=(-80.95, 15, 80.3), x_dir=(1, 0, 0), z_dir=(0, -1, 0)), Plane(origin=(-80.95, 15, 75.8), x_dir=(0, 0, 1), z_dir=(0, -1, 0)), Plane(origin=(-24.95, 15, 80.3), x_dir=(0, 0, -1), z_dir=(0, -1, 0)), Plane(origin=(-24.95, 15, 75.8), x_dir=(-1, 0, 0), z_dir=(0, -1, 0))) as fillet6_piece_2:
        with BuildLine():
            CenterArc((FILLET6_R, -FILLET6_R), FILLET6_R, 90, 90)
            Line((0, -FILLET6_R), (0, 0))
            Line((0, 0), (FILLET6_R, 0))
        make_face()
    extrude(amount=10.5)


solid = part.part
